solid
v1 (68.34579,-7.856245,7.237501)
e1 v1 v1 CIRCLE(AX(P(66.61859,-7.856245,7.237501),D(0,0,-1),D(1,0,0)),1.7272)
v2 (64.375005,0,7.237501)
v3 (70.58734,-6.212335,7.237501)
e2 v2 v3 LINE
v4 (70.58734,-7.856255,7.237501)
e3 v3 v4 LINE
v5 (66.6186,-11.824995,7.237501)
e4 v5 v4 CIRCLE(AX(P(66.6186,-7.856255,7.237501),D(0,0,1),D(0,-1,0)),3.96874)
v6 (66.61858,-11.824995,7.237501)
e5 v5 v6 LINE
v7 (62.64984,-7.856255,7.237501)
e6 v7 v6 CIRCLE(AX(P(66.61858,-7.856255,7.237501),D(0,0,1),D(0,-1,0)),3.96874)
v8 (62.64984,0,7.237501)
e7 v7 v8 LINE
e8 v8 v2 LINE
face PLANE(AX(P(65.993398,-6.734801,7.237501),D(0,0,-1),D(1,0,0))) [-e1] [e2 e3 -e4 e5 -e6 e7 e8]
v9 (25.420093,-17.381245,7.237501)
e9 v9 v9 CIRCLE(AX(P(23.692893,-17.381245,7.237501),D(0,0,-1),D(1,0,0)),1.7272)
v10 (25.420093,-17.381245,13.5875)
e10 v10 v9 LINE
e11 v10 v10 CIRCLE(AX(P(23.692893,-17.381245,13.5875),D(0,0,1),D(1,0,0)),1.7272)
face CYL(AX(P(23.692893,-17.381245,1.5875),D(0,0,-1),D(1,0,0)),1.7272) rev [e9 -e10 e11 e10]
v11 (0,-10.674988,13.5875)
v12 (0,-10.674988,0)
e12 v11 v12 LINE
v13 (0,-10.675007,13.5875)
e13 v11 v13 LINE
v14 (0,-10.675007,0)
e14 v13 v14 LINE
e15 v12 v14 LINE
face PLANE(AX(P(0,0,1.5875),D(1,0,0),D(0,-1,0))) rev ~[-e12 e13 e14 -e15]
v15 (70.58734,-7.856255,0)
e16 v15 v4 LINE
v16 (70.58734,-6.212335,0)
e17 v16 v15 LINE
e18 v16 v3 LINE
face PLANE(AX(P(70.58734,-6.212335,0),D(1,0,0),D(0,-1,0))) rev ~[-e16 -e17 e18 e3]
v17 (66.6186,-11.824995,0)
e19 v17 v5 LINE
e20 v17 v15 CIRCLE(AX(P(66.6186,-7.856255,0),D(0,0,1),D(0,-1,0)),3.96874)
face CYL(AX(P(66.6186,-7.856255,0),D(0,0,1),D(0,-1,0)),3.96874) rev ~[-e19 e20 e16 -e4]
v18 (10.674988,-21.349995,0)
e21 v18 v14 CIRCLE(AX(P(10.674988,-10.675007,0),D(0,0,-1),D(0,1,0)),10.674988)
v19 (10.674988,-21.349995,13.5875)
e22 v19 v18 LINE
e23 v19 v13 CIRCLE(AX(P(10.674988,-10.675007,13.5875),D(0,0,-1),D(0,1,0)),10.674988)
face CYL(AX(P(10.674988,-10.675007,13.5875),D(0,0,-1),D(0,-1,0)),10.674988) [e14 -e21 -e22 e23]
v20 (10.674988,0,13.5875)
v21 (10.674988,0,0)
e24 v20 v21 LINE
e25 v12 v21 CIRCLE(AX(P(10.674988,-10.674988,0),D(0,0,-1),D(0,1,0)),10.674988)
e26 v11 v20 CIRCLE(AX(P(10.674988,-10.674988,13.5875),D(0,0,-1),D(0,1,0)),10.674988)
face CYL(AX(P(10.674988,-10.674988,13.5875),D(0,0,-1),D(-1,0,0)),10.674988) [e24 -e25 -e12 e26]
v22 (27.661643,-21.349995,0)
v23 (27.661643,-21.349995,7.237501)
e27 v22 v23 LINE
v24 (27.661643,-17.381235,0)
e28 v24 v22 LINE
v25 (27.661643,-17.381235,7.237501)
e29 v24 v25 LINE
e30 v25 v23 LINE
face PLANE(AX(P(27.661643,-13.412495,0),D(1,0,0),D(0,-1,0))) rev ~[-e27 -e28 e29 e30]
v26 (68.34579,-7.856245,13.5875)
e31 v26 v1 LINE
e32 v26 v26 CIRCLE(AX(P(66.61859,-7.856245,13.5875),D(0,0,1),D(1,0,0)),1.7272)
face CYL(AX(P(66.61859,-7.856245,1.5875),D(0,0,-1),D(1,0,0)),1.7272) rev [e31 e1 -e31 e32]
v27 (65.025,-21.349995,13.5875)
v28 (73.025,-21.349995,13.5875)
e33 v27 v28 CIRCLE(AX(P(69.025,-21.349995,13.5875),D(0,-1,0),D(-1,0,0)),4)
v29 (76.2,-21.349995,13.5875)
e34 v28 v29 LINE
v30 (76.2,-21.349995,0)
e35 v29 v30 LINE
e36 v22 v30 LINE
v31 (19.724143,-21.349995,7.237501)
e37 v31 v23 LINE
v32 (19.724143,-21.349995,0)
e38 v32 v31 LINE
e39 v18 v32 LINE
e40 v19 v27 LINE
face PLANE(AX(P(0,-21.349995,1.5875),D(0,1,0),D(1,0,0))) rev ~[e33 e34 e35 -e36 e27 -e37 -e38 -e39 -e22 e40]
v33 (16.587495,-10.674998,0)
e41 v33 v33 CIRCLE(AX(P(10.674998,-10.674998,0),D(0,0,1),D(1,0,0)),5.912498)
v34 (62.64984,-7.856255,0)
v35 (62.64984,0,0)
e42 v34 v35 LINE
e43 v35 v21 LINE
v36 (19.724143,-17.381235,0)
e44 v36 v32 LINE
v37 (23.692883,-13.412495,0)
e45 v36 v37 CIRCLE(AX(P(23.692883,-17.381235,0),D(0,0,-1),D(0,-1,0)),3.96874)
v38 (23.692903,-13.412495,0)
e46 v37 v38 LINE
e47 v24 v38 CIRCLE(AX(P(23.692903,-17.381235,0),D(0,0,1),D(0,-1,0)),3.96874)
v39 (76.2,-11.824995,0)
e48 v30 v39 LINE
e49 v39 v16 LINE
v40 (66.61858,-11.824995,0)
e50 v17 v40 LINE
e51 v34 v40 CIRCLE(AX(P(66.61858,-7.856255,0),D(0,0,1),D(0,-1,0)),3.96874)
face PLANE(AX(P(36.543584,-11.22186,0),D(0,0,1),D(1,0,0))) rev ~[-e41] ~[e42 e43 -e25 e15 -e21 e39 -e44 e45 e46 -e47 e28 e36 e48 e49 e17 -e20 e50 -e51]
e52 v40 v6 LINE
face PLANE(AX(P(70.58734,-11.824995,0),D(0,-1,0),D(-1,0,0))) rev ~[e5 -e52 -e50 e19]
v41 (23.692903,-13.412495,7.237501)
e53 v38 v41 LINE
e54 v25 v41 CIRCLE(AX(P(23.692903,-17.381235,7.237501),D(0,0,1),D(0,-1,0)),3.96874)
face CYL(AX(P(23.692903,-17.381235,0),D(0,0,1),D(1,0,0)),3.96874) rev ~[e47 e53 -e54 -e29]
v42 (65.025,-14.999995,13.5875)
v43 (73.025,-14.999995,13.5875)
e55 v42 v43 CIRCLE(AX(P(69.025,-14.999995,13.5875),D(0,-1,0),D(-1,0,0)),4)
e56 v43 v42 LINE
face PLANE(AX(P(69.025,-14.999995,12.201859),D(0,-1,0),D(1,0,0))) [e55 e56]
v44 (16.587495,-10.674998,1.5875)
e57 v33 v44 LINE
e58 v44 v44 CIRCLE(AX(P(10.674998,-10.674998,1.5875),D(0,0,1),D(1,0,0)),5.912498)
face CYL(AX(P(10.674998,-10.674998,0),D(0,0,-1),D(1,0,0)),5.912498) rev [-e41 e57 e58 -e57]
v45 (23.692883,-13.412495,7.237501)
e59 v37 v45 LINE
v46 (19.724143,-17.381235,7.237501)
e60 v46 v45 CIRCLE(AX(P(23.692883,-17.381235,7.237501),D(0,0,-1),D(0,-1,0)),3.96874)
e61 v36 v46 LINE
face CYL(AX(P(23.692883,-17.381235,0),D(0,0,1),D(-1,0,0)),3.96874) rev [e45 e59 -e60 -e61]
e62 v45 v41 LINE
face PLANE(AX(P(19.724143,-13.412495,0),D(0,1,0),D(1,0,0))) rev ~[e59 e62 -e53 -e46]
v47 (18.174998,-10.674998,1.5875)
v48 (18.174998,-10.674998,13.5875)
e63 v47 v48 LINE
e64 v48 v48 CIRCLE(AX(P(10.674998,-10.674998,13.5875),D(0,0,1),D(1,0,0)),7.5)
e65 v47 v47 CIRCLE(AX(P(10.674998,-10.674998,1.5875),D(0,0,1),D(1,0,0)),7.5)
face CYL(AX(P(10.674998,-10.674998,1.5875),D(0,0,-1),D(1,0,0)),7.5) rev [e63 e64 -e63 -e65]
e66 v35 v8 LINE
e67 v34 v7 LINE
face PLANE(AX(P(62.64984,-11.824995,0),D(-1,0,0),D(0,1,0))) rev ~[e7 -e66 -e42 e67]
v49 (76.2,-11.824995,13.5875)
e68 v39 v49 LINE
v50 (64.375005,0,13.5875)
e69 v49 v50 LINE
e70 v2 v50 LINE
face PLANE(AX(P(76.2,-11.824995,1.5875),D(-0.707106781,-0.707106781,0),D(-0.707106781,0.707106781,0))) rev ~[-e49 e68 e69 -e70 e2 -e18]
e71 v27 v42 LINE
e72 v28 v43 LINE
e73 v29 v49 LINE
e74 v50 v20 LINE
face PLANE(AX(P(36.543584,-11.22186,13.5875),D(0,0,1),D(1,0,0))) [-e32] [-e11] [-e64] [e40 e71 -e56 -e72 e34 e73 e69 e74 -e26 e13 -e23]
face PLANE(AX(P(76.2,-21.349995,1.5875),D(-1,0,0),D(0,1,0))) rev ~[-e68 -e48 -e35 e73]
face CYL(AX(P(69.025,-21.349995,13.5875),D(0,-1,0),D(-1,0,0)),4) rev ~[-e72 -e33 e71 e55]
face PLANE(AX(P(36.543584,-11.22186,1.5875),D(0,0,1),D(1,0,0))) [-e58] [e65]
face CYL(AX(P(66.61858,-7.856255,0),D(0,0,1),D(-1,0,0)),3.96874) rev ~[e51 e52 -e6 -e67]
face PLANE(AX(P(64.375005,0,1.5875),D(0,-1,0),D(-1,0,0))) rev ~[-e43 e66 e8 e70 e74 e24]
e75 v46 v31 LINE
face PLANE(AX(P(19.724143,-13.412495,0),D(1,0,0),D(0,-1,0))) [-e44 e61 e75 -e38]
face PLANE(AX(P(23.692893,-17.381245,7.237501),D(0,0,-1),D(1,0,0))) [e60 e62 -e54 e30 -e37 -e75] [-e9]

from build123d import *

# Parameters (mm, degrees)
F0_R     = 1.7272
F0_R_2   = 5.9124977
F1_DEPTH = 1.5875
F2_R     = 1.7272
F2_R_2   = 7.5
F3_DEPTH = 12
F5_DEPTH = 6.35
F6_R     = 10.674988
F7_W     = 7.9375
F7_H     = 7.9375
F8_DEPTH = 7.2375014
F9_R     = 3.96874


# Not quite as in the source:
# - a fillet or chamfer is up to 0.001 mm smaller than in the source, because OpenCascade refuses the exact size


with BuildPart() as f1:
    # F0 (on Top) → F1 (new body)
    with BuildSketch(Plane.XY):
        Polygon((64.3750046, 0), (0, 0), (0, -21.3499954), (76.2, -21.3499954), (76.2, -11.8249954), align=None)
        with Locations((23.692892633, -17.3812454)):
            Circle(F0_R, mode=Mode.SUBTRACT)
        with Locations((10.6749977, -10.6749977)):
            Circle(F0_R_2, mode=Mode.SUBTRACT)
        with Locations((66.6185899243, -7.8562454)):
            Circle(F0_R, mode=Mode.SUBTRACT)
    extrude(amount=F1_DEPTH)

    # F2 (on face) → F3 (join)
    with BuildSketch(Plane.XY.offset(1.5875)):
        Polygon((76.2, -21.3499954), (76.2, -11.8249954), (64.3750046, 0), (0, 0), (0, -21.3499954), align=None)
        with Locations((23.692892633, -17.3812454)):
            Circle(F2_R, mode=Mode.SUBTRACT)
        with Locations((10.6749977, -10.6749977)):
            Circle(F2_R_2, mode=Mode.SUBTRACT)
        with Locations((66.6185899243, -7.8562454)):
            Circle(F2_R, mode=Mode.SUBTRACT)
    extrude(amount=F3_DEPTH)

    # F4 (on face) → F5 (cut)
    with BuildSketch(Plane.XZ.offset(21.3499954)):
        with BuildLine():
            Line((73.025, 13.5875), (65.025, 13.5875))
            ThreePointArc((65.025, 13.5875), (69.025, 9.5875), (73.025, 13.5875))
        make_face()
    extrude(amount=-F5_DEPTH, mode=Mode.SUBTRACT)

    # F6 (radius 10.6749977 in the source; OpenCascade refuses exactly that, so slightly less here)
    f6_edges = [f1.edges().sort_by_distance(p)[0] for p in [
        (0, -21.349995, 6.79375),
        (0, 0, 6.79375),
    ]]
    fillet(f6_edges, radius=F6_R)

    # F7 (on face) → F8 (cut)
    with BuildSketch(Plane(origin=(0, 0, 0), x_dir=(1, 0, 0), z_dir=(0, 0, -1))):
        with Locations((23.692892633, 17.3812454)):
            Rectangle(F7_W, F7_H)
        Polygon((62.6498399243, 11.8249954), (62.6498399243, 0), (64.3750046, 0), (70.5873399243, 6.2123353243), (70.5873399243, 11.8249954), align=None)
    extrude(amount=-F8_DEPTH, mode=Mode.SUBTRACT)

    # F9 (radius 3.96875 in the source; OpenCascade refuses exactly that, so slightly less here)
    f9_edges = [f1.edges().sort_by_distance(p)[0] for p in [
        (62.64984, -11.824995, 3.618751),
        (70.58734, -11.824995, 3.618751),
        (19.724143, -13.412495, 3.618751),
        (27.661643, -13.412495, 3.618751),
    ]]
    fillet(f9_edges, radius=F9_R)


solid = f1.part
